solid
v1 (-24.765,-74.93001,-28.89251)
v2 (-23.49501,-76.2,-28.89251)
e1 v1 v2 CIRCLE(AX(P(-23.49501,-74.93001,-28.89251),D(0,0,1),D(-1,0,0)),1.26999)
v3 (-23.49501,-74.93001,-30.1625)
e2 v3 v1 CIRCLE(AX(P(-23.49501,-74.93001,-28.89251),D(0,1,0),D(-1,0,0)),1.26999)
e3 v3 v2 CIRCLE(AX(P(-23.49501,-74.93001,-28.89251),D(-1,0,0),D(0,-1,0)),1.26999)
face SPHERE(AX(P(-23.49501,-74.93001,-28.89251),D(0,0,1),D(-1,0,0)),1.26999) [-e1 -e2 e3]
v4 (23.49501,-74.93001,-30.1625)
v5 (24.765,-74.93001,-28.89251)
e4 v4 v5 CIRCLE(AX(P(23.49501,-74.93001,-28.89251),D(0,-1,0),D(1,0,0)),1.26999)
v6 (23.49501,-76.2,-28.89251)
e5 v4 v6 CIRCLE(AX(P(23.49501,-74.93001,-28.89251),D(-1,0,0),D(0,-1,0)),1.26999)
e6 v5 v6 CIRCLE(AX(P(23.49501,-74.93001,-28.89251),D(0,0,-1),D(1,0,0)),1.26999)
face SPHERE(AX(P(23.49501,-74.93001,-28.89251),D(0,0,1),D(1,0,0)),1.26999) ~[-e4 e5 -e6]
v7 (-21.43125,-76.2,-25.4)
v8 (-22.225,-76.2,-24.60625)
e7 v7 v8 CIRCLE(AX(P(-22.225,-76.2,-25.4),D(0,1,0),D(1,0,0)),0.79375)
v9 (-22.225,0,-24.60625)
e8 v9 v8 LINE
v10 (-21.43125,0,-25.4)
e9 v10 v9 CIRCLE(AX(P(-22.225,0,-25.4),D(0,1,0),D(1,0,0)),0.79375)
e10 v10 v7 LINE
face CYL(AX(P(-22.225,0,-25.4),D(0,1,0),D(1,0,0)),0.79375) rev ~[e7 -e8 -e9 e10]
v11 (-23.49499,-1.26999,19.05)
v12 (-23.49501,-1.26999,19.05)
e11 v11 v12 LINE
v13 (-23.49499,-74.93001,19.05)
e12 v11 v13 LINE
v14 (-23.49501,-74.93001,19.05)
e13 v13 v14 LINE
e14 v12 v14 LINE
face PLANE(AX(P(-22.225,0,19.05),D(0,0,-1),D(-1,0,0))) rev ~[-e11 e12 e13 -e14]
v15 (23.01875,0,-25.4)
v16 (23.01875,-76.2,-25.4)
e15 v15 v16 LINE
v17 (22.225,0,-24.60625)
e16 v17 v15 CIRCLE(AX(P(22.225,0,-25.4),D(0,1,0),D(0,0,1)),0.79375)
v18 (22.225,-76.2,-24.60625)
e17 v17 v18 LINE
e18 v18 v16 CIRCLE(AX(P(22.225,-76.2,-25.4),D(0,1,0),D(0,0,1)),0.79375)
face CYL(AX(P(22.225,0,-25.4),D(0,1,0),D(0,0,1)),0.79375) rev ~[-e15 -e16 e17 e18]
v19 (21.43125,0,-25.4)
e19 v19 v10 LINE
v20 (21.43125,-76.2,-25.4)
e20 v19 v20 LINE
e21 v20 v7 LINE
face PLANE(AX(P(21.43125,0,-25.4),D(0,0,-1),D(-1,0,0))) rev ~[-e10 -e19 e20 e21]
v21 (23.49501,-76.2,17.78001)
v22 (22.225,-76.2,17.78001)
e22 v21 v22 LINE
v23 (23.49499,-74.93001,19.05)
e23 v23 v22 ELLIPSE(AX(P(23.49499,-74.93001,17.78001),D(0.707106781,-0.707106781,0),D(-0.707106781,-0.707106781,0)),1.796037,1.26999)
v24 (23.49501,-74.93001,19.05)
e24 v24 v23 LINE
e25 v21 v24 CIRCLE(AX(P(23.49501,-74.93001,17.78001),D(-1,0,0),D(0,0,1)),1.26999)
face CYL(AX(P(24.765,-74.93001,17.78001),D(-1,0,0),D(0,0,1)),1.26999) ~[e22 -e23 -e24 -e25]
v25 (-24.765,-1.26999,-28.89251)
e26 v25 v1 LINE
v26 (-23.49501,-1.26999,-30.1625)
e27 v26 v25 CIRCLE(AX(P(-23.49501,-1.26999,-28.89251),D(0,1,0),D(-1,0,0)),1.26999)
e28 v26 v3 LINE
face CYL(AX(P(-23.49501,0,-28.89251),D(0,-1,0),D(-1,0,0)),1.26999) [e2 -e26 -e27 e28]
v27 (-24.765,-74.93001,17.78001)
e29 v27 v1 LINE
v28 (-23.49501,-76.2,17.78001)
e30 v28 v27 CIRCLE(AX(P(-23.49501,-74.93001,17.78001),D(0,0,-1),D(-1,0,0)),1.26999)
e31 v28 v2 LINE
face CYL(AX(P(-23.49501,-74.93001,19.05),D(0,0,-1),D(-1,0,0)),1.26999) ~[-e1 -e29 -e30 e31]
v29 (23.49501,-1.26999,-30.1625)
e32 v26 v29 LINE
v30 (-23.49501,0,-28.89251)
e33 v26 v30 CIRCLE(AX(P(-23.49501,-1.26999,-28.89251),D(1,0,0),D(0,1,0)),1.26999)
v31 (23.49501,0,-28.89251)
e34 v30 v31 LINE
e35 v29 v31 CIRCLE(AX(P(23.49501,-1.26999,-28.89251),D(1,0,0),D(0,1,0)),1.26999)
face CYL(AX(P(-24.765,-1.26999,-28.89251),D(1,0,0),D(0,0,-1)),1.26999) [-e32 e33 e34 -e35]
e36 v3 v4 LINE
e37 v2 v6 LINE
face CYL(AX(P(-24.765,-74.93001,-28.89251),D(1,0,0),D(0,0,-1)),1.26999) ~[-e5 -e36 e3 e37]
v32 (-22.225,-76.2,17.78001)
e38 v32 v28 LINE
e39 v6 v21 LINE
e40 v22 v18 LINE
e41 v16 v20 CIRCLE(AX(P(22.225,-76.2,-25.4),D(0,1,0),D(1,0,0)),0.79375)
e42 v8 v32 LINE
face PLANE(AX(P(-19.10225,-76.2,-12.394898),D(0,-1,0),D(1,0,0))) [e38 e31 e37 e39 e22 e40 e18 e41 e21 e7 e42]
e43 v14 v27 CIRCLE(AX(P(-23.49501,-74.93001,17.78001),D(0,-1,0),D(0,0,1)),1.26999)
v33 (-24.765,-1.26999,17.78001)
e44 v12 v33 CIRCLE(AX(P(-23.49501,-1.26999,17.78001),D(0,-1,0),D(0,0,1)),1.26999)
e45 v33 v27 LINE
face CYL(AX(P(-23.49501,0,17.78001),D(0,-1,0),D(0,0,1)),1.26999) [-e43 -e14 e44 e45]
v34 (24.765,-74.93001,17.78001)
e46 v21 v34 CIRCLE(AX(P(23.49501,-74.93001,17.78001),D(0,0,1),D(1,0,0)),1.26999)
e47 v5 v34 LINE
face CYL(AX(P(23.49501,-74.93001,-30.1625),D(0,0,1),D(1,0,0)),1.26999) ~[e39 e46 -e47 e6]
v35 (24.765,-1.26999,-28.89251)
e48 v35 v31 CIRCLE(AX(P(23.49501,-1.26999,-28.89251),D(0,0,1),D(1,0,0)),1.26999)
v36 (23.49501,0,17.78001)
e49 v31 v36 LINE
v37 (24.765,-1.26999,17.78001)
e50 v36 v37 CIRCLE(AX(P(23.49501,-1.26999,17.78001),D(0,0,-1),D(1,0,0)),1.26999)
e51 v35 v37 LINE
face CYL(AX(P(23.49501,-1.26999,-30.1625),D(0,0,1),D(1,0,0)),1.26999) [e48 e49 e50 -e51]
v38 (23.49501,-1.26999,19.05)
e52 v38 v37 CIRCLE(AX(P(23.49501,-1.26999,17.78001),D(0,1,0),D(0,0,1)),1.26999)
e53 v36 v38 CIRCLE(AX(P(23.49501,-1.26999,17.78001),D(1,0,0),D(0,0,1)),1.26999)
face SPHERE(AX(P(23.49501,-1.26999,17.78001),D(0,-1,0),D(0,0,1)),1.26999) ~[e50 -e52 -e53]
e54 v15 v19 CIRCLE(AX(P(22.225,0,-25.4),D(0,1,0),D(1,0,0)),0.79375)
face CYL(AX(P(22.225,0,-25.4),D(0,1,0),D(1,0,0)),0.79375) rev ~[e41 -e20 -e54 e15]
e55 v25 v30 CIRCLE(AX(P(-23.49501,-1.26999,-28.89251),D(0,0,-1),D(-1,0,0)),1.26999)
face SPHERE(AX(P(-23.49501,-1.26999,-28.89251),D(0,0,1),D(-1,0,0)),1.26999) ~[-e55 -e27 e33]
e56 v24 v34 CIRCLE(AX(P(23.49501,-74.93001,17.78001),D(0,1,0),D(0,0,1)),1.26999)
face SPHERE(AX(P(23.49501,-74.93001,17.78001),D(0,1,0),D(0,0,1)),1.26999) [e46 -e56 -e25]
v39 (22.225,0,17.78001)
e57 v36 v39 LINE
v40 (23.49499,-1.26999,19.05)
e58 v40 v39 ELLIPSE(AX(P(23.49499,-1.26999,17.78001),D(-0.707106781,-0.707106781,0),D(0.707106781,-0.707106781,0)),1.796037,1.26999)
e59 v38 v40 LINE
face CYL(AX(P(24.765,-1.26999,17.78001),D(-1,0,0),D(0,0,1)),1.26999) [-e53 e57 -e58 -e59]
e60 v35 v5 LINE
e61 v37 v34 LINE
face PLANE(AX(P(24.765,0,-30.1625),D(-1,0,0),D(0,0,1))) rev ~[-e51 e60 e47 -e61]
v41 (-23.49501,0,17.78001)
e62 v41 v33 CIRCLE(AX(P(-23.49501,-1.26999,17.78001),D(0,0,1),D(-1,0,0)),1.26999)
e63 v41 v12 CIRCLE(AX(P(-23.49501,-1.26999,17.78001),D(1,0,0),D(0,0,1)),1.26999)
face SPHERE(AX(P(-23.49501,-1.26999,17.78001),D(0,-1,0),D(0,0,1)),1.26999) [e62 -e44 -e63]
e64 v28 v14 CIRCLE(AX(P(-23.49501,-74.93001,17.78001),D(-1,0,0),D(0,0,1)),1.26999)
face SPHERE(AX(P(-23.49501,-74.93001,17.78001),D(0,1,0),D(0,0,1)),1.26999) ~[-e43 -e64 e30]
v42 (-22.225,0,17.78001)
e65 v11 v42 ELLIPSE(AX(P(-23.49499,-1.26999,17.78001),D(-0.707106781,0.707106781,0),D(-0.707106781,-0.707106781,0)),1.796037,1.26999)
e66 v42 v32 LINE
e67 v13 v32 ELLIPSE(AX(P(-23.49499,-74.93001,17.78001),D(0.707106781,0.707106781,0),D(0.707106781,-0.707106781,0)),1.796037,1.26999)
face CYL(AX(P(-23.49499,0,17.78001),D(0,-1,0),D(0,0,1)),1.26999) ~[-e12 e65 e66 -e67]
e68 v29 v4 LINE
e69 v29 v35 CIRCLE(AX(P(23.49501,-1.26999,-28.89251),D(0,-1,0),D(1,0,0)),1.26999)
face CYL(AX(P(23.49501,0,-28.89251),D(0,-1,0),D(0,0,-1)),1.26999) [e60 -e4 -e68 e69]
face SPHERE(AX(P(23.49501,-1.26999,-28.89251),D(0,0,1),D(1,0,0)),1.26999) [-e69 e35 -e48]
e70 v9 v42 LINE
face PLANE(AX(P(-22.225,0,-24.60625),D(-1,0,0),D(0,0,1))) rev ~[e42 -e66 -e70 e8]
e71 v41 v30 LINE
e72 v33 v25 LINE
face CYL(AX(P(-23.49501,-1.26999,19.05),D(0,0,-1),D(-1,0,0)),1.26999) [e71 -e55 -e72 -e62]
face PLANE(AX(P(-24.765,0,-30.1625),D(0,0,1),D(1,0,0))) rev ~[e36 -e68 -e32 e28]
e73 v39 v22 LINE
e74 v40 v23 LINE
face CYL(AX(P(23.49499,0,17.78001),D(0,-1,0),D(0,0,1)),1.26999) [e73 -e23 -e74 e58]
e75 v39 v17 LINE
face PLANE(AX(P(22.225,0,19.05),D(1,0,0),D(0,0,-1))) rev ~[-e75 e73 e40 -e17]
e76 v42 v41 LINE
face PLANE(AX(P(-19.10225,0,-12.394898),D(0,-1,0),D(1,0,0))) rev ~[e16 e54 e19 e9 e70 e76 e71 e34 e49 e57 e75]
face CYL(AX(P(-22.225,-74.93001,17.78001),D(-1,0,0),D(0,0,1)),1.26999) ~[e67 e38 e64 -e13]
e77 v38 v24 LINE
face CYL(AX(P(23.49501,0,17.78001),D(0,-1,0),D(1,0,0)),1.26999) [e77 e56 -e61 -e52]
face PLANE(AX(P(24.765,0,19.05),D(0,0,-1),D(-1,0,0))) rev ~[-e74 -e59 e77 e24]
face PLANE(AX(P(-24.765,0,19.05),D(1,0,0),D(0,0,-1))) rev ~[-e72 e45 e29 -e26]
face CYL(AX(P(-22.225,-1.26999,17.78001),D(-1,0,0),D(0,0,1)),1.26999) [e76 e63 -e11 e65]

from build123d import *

# Parameters (mm, degrees)
F1_DEPTH = 76.2
F2_R     = 1.26999


# Not quite as in the source:
# - a fillet or chamfer is up to 0.001 mm smaller than in the source, because OpenCascade refuses the exact size


with BuildPart() as f1:
    # F0 (on Front) → F1 (new body)
    with BuildSketch(Plane.XZ):
        with BuildLine():
            Line((-22.225, 19.05), (-24.765, 19.05))
            Line((-24.765, 19.05), (-24.765, -30.1625))
            Line((-24.765, -30.1625), (0, -30.1625))
            Line((0, -30.1625), (0, -25.4))
            Line((0, -25.4), (-21.43125, -25.4))
            ThreePointArc((-21.43125, -25.4), (-22.7862660076, -25.9612660076), (-22.225, -24.60625))
            Line((-22.225, -24.60625), (-22.225, 19.05))
        make_face()
        with BuildLine():
            Line((0, -25.4), (0, -30.1625))
            Line((0, -30.1625), (24.765, -30.1625))
            Line((24.765, -30.1625), (24.765, 19.05))
            Line((24.765, 19.05), (22.225, 19.05))
            Line((22.225, 19.05), (22.225, -24.60625))
            ThreePointArc((22.225, -24.60625), (22.7862660076, -24.8387339924), (23.01875, -25.4))
            ThreePointArc((23.01875, -25.4), (22.225, -26.19375), (21.43125, -25.4))
            Line((21.43125, -25.4), (0, -25.4))
        make_face()
    extrude(amount=F1_DEPTH)

    # F2 (radius 1.27 in the source; OpenCascade refuses exactly that, so slightly less here)
    f2_edges = [f1.edges().sort_by_distance(p)[0] for p in [
        (24.765, -38.1, 19.05),
        (22.225, -38.1, 19.05),
        (23.495, 0, 19.05),
        (23.495, -76.2, 19.05),
        (-22.225, -38.1, 19.05),
        (-24.765, -38.1, 19.05),
        (-23.495, 0, 19.05),
        (-23.495, -76.2, 19.05),
        (-24.765, -76.2, -5.55625),
        (24.765, -76.2, -5.55625),
        (24.765, 0, -5.55625),
        (-24.765, 0, -5.55625),
        (-24.765, -38.1, -30.1625),
        (24.765, -38.1, -30.1625),
        (0, 0, -30.1625),
        (0, -76.2, -30.1625),
    ]]
    fillet(f2_edges, radius=F2_R)


solid = f1.part
